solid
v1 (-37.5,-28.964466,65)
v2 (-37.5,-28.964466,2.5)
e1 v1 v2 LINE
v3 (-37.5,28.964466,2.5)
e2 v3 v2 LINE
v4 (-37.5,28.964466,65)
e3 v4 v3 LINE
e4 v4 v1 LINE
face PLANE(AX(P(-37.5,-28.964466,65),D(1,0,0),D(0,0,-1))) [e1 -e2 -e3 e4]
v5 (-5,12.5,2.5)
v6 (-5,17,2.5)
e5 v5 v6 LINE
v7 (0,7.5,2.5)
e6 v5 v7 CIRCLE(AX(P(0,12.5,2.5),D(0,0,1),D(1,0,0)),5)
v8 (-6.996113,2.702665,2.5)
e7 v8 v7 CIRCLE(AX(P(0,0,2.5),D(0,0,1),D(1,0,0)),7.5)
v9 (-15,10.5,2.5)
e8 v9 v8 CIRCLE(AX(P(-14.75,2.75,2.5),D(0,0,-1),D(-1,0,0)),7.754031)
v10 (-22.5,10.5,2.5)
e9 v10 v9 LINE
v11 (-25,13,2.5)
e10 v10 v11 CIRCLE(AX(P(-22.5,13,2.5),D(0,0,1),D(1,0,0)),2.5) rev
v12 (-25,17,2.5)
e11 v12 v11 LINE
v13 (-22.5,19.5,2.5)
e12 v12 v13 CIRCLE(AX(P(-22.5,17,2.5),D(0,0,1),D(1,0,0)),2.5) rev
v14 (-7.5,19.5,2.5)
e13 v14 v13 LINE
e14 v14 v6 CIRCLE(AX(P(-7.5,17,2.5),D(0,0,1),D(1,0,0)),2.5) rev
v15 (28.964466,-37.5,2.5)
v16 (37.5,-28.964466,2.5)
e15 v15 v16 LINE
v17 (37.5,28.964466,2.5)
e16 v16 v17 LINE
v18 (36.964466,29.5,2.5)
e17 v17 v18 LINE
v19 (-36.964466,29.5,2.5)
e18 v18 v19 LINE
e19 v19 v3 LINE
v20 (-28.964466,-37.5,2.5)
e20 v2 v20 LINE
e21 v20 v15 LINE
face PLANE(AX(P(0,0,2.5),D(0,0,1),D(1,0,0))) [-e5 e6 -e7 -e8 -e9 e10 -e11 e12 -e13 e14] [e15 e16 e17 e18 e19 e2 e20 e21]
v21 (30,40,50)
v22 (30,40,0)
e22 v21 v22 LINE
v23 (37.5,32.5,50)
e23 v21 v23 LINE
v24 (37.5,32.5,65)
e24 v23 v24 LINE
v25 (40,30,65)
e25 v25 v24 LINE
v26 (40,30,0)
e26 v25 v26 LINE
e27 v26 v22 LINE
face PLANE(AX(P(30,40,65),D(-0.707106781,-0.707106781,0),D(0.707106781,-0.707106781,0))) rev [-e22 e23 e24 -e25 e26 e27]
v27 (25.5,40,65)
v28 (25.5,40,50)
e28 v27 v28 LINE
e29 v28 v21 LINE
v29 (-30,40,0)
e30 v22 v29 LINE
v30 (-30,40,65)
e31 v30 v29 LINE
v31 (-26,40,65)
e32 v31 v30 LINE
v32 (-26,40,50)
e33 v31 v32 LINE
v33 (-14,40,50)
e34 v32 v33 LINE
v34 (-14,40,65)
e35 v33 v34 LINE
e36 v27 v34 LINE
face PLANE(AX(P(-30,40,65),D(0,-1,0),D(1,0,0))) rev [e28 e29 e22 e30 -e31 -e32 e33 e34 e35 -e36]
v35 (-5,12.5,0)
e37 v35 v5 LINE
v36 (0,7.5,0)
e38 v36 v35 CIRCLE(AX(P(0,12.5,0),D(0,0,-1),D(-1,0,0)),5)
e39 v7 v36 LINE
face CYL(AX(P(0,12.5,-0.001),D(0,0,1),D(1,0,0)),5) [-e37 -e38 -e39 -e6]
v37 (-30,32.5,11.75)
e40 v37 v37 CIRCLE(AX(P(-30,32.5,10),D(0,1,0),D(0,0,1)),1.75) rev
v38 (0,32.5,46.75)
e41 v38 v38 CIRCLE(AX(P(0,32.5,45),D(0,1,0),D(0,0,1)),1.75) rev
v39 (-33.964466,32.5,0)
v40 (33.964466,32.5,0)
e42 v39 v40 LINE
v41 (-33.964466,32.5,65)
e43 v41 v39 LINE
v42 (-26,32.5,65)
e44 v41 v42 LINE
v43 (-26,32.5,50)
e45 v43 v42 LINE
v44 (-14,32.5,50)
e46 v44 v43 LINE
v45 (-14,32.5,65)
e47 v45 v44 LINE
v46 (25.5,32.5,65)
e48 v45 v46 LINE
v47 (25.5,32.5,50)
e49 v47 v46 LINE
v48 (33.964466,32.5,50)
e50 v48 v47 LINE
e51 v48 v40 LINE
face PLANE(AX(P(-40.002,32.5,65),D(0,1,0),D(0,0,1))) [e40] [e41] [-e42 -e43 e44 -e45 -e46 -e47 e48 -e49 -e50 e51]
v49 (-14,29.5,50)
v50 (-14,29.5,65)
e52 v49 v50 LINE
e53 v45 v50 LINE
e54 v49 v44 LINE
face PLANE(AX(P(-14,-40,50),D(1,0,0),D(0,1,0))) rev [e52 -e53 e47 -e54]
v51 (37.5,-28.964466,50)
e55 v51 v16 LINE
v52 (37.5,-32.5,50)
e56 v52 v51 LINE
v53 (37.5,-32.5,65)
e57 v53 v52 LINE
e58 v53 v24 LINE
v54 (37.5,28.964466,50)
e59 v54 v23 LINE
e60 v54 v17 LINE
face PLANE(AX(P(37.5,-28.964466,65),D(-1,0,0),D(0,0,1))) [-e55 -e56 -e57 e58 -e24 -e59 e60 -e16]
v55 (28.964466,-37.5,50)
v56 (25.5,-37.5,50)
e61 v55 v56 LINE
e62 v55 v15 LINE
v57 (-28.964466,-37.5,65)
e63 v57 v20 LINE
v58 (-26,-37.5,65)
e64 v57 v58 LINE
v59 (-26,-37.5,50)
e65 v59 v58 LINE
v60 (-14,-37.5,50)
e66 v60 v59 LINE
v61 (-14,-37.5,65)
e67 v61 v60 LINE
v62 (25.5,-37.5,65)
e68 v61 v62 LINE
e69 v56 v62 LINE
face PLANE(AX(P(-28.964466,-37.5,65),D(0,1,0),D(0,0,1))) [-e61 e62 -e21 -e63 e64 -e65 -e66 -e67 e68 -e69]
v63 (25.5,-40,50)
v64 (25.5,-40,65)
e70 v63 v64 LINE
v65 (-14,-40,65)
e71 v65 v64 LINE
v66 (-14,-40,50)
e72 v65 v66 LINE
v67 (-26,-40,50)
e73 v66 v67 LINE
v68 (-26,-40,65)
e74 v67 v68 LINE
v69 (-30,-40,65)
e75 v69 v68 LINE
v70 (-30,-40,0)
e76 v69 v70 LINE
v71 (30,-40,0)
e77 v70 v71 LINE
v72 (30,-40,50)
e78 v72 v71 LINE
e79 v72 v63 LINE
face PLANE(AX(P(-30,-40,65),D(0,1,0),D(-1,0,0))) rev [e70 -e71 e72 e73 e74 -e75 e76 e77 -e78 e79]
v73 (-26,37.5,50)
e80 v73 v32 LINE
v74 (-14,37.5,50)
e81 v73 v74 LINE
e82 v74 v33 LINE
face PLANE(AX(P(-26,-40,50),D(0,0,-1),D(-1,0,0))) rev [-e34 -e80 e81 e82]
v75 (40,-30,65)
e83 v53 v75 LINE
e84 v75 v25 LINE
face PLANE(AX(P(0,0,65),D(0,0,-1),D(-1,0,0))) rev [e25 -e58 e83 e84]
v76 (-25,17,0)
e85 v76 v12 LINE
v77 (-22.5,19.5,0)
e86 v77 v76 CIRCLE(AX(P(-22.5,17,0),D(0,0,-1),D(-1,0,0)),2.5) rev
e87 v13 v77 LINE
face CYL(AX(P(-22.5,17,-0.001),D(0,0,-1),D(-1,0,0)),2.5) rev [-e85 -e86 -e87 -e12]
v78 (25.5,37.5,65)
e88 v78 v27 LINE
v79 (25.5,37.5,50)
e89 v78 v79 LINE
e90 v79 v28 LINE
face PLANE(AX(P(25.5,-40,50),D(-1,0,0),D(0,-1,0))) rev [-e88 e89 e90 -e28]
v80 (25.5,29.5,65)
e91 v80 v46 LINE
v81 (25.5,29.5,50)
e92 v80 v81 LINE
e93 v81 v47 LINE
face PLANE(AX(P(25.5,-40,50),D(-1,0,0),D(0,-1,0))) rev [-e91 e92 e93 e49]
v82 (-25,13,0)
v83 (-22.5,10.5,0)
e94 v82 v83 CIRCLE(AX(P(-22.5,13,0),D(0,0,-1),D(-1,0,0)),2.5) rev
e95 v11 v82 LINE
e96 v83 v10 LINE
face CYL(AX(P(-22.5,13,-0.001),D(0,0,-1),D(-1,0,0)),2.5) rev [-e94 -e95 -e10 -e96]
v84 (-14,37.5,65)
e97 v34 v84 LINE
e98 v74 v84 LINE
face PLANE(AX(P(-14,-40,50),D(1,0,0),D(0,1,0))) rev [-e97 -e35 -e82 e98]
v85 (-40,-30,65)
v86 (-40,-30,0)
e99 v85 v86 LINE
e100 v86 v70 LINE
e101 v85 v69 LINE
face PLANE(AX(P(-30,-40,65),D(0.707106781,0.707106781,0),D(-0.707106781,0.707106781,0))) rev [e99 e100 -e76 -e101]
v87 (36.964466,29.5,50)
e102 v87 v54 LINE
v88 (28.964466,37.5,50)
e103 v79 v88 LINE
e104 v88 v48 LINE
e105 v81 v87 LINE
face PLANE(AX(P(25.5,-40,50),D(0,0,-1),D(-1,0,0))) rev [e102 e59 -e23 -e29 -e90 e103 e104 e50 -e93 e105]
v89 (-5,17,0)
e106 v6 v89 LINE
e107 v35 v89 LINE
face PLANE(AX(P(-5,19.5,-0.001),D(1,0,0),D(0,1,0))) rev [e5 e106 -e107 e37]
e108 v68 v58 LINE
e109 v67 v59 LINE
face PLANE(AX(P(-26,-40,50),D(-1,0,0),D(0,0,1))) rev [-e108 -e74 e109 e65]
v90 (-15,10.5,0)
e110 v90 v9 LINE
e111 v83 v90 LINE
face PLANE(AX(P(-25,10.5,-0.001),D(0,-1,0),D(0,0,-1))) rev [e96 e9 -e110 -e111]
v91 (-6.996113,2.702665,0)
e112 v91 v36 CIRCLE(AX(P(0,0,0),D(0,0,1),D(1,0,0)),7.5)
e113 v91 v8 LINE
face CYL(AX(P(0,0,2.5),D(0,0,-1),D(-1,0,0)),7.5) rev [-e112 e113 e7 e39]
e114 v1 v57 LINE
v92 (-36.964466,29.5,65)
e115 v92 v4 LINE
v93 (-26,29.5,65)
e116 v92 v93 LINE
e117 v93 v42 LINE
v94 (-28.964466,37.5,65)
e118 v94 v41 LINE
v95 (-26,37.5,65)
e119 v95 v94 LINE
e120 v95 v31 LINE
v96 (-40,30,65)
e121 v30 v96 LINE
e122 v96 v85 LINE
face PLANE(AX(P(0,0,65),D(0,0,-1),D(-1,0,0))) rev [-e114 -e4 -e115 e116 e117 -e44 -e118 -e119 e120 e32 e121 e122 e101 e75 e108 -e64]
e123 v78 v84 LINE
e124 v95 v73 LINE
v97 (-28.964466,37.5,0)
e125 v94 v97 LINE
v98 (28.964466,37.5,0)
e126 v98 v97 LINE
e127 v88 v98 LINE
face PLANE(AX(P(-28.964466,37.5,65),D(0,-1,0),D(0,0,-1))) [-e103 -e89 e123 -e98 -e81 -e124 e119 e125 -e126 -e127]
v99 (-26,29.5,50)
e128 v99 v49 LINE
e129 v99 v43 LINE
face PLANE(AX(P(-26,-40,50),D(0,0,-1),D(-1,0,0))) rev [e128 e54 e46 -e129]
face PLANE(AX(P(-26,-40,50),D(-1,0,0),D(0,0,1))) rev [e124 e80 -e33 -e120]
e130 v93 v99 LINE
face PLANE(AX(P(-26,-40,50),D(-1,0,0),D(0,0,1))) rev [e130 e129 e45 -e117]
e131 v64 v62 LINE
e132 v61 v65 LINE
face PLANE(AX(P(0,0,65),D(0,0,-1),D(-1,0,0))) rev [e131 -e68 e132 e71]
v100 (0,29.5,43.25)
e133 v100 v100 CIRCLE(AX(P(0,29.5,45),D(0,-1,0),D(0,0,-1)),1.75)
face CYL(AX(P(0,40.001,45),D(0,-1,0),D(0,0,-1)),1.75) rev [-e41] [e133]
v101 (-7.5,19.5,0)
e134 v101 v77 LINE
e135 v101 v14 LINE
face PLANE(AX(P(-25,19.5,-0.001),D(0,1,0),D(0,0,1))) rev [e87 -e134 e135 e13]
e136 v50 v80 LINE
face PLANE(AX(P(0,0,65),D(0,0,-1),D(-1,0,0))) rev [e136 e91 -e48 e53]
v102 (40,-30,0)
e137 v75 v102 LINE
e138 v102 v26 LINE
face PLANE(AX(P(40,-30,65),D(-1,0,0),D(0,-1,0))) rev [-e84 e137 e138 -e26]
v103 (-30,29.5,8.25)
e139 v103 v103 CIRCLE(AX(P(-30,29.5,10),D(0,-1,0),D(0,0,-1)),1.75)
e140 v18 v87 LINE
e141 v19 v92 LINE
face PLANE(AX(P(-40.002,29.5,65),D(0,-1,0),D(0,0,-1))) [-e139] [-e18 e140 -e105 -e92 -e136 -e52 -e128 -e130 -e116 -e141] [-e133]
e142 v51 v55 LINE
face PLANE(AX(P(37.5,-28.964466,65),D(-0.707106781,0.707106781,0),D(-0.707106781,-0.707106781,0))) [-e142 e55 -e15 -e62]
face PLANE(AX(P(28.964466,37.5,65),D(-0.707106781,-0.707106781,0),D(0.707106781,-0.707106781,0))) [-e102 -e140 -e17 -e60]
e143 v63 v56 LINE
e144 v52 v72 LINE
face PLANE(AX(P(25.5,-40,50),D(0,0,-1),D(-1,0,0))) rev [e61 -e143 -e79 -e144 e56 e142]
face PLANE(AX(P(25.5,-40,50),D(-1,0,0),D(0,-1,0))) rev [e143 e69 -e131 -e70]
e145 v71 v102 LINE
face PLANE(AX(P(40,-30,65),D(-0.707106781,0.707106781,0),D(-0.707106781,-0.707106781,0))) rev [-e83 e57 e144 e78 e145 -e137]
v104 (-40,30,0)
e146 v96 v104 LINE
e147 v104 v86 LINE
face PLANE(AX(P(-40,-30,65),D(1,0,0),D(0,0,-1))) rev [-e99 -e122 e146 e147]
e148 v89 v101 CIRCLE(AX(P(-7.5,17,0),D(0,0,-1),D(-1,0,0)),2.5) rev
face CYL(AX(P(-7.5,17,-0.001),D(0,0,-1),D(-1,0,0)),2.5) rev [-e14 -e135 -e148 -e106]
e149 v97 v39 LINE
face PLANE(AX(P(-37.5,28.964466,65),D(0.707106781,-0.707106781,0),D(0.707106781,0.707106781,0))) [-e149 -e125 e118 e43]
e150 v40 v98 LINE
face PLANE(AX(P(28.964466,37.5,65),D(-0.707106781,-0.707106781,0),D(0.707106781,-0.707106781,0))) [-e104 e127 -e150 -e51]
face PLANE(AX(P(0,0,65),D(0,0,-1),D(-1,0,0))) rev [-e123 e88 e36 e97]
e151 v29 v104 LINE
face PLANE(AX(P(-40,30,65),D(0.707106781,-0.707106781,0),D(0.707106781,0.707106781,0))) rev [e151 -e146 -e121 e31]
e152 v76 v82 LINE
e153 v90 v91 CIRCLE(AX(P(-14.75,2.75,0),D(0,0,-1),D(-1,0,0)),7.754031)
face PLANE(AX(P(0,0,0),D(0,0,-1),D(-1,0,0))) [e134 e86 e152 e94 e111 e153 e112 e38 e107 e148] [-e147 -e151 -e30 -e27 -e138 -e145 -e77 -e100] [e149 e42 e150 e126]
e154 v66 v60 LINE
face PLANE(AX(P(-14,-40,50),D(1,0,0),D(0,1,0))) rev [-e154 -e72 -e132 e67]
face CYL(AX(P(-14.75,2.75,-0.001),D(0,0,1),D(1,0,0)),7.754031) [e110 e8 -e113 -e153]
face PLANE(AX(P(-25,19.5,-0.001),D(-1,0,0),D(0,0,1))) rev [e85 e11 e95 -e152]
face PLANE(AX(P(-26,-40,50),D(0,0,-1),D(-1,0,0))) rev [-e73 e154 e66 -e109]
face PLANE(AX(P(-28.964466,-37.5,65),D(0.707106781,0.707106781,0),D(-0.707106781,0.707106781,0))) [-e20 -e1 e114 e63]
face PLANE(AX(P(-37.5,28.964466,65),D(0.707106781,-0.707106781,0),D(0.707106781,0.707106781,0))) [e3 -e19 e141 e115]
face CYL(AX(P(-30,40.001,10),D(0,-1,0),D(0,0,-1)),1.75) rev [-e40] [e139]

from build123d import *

# Parameters (mm, degrees)
BOSS_EXTRUDE1_DEPTH             = 65
SKETCH2_R                       = 7.5
BOSS_EXTRUDE2_DEPTH             = 2.5
BOSS_EXTRUDE3_REACH             = 88.168
SKETCH3_W                       = 65
SKETCH3_H                       = 3
BOSS_EXTRUDE3_DIRECTION_2_REACH = 88.168
CUT_EXTRUDE2_REACH              = 124.042
SKETCH6_R                       = 1.75
CUT_EXTRUDE3_REACH              = 86.299
CUT_EXTRUDE4_REACH              = 86.299
FILLET1_R                       = 2.5
FILLET2_R                       = 5
CUT_EXTRUDE5_DEPTH              = 111.566721937
CUT_EXTRUDE5_DEPTH_BACK         = 111.566721937
SKETCH9_W                       = 12
SKETCH9_H                       = 32.949220019
SKETCH9_H_2                     = 17.949220019


with BuildPart() as part:
    # Sketch1 → Boss-Extrude1 (new body)
    with BuildSketch(Plane.XY):
        Polygon((-40, 30), (-30, 40), (30, 40), (40, 30), (40, -30), (30, -40), (-30, -40), (-40, -30), align=None)
        Polygon((-37.5, 28.964466094), (-28.964466094, 37.5), (28.964466094, 37.5), (37.5, 28.964466094), (37.5, -28.964466094), (28.964466094, -37.5), (-28.964466094, -37.5), (-37.5, -28.964466094), align=None, mode=Mode.SUBTRACT)
    extrude(amount=BOSS_EXTRUDE1_DEPTH)

    # Sketch2 → Boss-Extrude2 (add)
    with BuildSketch(Plane.XY):
        Polygon((37.5, 28.964466094), (28.964466094, 37.5), (-28.964466094, 37.5), (-37.5, 28.964466094), (-37.5, -28.964466094), (-28.964466094, -37.5), (28.964466094, -37.5), (37.5, -28.964466094), align=None)
        Circle(SKETCH2_R, mode=Mode.SUBTRACT)
    extrude(amount=BOSS_EXTRUDE2_DEPTH)

    # Boss-Extrude3: up to this plane
    boss_extrude3_end = Plane(origin=(28.964466094, 37.5, 65), z_dir=(-0.7071067811865476, -0.7071067811865476, 0))
    # Sketch3 → Boss-Extrude3 (add, up to the surface)
    with BuildSketch(Plane(origin=(0, 0, 0), x_dir=(0, 0, -1), z_dir=(1, 0, 0)), mode=Mode.PRIVATE) as boss_extrude3_sk1:
        with Locations((-32.5, 31)):
            Rectangle(SKETCH3_W, SKETCH3_H)
    boss_extrude3_tool1 = split(extrude(boss_extrude3_sk1.sketch, amount=BOSS_EXTRUDE3_REACH, mode=Mode.PRIVATE), bisect_by=boss_extrude3_end, keep=Keep.BOTH, mode=Mode.PRIVATE)
    add(boss_extrude3_tool1.solids().sort_by_distance((0, 31, 32.5))[0])

    # Boss-Extrude3 direction 2: up to this plane
    boss_extrude3_direction_2_end = Plane(origin=(-37.5, 28.964466094, 65), z_dir=(0.707106781186547, -0.7071067811865481, 0))
    # Sketch3 → Boss-Extrude3 direction 2 (add, up to the surface)
    with BuildSketch(Plane(origin=(0, 0, 0), x_dir=(0, 0, -1), z_dir=(1, 0, 0)), mode=Mode.PRIVATE) as boss_extrude3_direction_2_sk1:
        with Locations((-32.5, 31)):
            Rectangle(SKETCH3_W, SKETCH3_H)
    boss_extrude3_direction_2_tool1 = split(extrude(boss_extrude3_direction_2_sk1.sketch, amount=-BOSS_EXTRUDE3_DIRECTION_2_REACH, mode=Mode.PRIVATE), bisect_by=boss_extrude3_direction_2_end, keep=Keep.BOTH, mode=Mode.PRIVATE)
    add(boss_extrude3_direction_2_tool1.solids().sort_by_distance((0, 31, 32.5))[0])

    # Sketch6 → Cut-Extrude2 (cut, up to next)
    with BuildSketch(Plane(origin=(0, 29.5, -27), x_dir=(-1, 0, 0), z_dir=(0, -1, 0)), mode=Mode.PRIVATE) as cut_extrude2_sk1:
        with Locations(Location((0, -72, 0), (0, 0, 90))):
            Circle(SKETCH6_R)
    cut_extrude2_tool1 = extrude(cut_extrude2_sk1.sketch, amount=-CUT_EXTRUDE2_REACH, mode=Mode.PRIVATE) & part.part
    # Sketch6 → Cut-Extrude2 (cut, up to next)
    with BuildSketch(Plane(origin=(0, 29.5, -27), x_dir=(-1, 0, 0), z_dir=(0, -1, 0)), mode=Mode.PRIVATE) as cut_extrude2_sk2:
        with Locations(Location((30, -37, 0), (0, 0, 90))):
            Circle(SKETCH6_R)
    cut_extrude2_tool2 = extrude(cut_extrude2_sk2.sketch, amount=-CUT_EXTRUDE2_REACH, mode=Mode.PRIVATE) & part.part
    add(cut_extrude2_tool1.solids().sort_by_distance((0, 29.5, 45))[0], mode=Mode.SUBTRACT)
    add(cut_extrude2_tool2.solids().sort_by_distance((-30, 29.5, 10))[0], mode=Mode.SUBTRACT)

    # Sketch7 → Cut-Extrude3 (cut, up to next)
    with BuildSketch(Plane.XY.offset(2.5), mode=Mode.PRIVATE) as cut_extrude3_sk1:
        Polygon((-33.964466094, 32.5), (-28.964466094, 37.5), (28.964466094, 37.5), (33.964466094, 32.5), align=None)
    cut_extrude3_tool1 = extrude(cut_extrude3_sk1.sketch, amount=-CUT_EXTRUDE3_REACH, mode=Mode.PRIVATE) & part.part
    add(cut_extrude3_tool1.solids().sort_by_distance((0, 34.933788, 2.5))[0], mode=Mode.SUBTRACT)

    # Sketch8 → Cut-Extrude4 (cut, up to next)
    with BuildSketch(Plane.XY.offset(2.5), mode=Mode.PRIVATE) as cut_extrude4_sk1:
        with BuildLine():
            Line((-5, 7.5), (0, 7.5))
            Line((0, 7.5), (-7.5, 0))
            ThreePointArc((-7.5, 0), (-8.440285268, 7.256939094), (-15, 10.5))
            Line((-15, 10.5), (-25, 10.5))
            Line((-25, 10.5), (-25, 19.5))
            Line((-25, 19.5), (-5, 19.5))
            Line((-5, 19.5), (-5, 7.5))
        make_face()
    cut_extrude4_tool1 = extrude(cut_extrude4_sk1.sketch, amount=-CUT_EXTRUDE4_REACH, mode=Mode.PRIVATE) & part.part
    add(cut_extrude4_tool1.solids().sort_by_distance((-13.255262, 13.384188, 2.5))[0], mode=Mode.SUBTRACT)

    # Fillet1
    fillet1_edges = [part.edges().sort_by_distance(p)[0] for p in [
        (-25, 10.5, 1.25),
        (-25, 19.5, 1.25),
        (-5, 19.5, 1.25),
    ]]
    fillet(fillet1_edges, radius=FILLET1_R)

    # Fillet2
    fillet2_edges = [part.edges().sort_by_distance(p)[0] for p in [
        (-5, 7.5, 1.25),
    ]]
    fillet(fillet2_edges, radius=FILLET2_R - 0.0001)  # a hair under: the kernel refuses the full size

    # Sketch9 → Cut-Extrude5 (cut, two sides: drawn at the far end of the back side and taken through both)
    with BuildSketch(Plane(origin=(0, 40, 0), x_dir=(1, 0, 0), z_dir=(0, 1, 0)).offset(-CUT_EXTRUDE5_DEPTH_BACK)):
        with Locations((31.5, -66.474610009)):
            Rectangle(SKETCH9_W, SKETCH9_H)
        with Locations((-20, -58.97461001)):
            Rectangle(SKETCH9_W, SKETCH9_H_2)
    extrude(amount=CUT_EXTRUDE5_DEPTH + CUT_EXTRUDE5_DEPTH_BACK, mode=Mode.SUBTRACT)


solid = part.part
